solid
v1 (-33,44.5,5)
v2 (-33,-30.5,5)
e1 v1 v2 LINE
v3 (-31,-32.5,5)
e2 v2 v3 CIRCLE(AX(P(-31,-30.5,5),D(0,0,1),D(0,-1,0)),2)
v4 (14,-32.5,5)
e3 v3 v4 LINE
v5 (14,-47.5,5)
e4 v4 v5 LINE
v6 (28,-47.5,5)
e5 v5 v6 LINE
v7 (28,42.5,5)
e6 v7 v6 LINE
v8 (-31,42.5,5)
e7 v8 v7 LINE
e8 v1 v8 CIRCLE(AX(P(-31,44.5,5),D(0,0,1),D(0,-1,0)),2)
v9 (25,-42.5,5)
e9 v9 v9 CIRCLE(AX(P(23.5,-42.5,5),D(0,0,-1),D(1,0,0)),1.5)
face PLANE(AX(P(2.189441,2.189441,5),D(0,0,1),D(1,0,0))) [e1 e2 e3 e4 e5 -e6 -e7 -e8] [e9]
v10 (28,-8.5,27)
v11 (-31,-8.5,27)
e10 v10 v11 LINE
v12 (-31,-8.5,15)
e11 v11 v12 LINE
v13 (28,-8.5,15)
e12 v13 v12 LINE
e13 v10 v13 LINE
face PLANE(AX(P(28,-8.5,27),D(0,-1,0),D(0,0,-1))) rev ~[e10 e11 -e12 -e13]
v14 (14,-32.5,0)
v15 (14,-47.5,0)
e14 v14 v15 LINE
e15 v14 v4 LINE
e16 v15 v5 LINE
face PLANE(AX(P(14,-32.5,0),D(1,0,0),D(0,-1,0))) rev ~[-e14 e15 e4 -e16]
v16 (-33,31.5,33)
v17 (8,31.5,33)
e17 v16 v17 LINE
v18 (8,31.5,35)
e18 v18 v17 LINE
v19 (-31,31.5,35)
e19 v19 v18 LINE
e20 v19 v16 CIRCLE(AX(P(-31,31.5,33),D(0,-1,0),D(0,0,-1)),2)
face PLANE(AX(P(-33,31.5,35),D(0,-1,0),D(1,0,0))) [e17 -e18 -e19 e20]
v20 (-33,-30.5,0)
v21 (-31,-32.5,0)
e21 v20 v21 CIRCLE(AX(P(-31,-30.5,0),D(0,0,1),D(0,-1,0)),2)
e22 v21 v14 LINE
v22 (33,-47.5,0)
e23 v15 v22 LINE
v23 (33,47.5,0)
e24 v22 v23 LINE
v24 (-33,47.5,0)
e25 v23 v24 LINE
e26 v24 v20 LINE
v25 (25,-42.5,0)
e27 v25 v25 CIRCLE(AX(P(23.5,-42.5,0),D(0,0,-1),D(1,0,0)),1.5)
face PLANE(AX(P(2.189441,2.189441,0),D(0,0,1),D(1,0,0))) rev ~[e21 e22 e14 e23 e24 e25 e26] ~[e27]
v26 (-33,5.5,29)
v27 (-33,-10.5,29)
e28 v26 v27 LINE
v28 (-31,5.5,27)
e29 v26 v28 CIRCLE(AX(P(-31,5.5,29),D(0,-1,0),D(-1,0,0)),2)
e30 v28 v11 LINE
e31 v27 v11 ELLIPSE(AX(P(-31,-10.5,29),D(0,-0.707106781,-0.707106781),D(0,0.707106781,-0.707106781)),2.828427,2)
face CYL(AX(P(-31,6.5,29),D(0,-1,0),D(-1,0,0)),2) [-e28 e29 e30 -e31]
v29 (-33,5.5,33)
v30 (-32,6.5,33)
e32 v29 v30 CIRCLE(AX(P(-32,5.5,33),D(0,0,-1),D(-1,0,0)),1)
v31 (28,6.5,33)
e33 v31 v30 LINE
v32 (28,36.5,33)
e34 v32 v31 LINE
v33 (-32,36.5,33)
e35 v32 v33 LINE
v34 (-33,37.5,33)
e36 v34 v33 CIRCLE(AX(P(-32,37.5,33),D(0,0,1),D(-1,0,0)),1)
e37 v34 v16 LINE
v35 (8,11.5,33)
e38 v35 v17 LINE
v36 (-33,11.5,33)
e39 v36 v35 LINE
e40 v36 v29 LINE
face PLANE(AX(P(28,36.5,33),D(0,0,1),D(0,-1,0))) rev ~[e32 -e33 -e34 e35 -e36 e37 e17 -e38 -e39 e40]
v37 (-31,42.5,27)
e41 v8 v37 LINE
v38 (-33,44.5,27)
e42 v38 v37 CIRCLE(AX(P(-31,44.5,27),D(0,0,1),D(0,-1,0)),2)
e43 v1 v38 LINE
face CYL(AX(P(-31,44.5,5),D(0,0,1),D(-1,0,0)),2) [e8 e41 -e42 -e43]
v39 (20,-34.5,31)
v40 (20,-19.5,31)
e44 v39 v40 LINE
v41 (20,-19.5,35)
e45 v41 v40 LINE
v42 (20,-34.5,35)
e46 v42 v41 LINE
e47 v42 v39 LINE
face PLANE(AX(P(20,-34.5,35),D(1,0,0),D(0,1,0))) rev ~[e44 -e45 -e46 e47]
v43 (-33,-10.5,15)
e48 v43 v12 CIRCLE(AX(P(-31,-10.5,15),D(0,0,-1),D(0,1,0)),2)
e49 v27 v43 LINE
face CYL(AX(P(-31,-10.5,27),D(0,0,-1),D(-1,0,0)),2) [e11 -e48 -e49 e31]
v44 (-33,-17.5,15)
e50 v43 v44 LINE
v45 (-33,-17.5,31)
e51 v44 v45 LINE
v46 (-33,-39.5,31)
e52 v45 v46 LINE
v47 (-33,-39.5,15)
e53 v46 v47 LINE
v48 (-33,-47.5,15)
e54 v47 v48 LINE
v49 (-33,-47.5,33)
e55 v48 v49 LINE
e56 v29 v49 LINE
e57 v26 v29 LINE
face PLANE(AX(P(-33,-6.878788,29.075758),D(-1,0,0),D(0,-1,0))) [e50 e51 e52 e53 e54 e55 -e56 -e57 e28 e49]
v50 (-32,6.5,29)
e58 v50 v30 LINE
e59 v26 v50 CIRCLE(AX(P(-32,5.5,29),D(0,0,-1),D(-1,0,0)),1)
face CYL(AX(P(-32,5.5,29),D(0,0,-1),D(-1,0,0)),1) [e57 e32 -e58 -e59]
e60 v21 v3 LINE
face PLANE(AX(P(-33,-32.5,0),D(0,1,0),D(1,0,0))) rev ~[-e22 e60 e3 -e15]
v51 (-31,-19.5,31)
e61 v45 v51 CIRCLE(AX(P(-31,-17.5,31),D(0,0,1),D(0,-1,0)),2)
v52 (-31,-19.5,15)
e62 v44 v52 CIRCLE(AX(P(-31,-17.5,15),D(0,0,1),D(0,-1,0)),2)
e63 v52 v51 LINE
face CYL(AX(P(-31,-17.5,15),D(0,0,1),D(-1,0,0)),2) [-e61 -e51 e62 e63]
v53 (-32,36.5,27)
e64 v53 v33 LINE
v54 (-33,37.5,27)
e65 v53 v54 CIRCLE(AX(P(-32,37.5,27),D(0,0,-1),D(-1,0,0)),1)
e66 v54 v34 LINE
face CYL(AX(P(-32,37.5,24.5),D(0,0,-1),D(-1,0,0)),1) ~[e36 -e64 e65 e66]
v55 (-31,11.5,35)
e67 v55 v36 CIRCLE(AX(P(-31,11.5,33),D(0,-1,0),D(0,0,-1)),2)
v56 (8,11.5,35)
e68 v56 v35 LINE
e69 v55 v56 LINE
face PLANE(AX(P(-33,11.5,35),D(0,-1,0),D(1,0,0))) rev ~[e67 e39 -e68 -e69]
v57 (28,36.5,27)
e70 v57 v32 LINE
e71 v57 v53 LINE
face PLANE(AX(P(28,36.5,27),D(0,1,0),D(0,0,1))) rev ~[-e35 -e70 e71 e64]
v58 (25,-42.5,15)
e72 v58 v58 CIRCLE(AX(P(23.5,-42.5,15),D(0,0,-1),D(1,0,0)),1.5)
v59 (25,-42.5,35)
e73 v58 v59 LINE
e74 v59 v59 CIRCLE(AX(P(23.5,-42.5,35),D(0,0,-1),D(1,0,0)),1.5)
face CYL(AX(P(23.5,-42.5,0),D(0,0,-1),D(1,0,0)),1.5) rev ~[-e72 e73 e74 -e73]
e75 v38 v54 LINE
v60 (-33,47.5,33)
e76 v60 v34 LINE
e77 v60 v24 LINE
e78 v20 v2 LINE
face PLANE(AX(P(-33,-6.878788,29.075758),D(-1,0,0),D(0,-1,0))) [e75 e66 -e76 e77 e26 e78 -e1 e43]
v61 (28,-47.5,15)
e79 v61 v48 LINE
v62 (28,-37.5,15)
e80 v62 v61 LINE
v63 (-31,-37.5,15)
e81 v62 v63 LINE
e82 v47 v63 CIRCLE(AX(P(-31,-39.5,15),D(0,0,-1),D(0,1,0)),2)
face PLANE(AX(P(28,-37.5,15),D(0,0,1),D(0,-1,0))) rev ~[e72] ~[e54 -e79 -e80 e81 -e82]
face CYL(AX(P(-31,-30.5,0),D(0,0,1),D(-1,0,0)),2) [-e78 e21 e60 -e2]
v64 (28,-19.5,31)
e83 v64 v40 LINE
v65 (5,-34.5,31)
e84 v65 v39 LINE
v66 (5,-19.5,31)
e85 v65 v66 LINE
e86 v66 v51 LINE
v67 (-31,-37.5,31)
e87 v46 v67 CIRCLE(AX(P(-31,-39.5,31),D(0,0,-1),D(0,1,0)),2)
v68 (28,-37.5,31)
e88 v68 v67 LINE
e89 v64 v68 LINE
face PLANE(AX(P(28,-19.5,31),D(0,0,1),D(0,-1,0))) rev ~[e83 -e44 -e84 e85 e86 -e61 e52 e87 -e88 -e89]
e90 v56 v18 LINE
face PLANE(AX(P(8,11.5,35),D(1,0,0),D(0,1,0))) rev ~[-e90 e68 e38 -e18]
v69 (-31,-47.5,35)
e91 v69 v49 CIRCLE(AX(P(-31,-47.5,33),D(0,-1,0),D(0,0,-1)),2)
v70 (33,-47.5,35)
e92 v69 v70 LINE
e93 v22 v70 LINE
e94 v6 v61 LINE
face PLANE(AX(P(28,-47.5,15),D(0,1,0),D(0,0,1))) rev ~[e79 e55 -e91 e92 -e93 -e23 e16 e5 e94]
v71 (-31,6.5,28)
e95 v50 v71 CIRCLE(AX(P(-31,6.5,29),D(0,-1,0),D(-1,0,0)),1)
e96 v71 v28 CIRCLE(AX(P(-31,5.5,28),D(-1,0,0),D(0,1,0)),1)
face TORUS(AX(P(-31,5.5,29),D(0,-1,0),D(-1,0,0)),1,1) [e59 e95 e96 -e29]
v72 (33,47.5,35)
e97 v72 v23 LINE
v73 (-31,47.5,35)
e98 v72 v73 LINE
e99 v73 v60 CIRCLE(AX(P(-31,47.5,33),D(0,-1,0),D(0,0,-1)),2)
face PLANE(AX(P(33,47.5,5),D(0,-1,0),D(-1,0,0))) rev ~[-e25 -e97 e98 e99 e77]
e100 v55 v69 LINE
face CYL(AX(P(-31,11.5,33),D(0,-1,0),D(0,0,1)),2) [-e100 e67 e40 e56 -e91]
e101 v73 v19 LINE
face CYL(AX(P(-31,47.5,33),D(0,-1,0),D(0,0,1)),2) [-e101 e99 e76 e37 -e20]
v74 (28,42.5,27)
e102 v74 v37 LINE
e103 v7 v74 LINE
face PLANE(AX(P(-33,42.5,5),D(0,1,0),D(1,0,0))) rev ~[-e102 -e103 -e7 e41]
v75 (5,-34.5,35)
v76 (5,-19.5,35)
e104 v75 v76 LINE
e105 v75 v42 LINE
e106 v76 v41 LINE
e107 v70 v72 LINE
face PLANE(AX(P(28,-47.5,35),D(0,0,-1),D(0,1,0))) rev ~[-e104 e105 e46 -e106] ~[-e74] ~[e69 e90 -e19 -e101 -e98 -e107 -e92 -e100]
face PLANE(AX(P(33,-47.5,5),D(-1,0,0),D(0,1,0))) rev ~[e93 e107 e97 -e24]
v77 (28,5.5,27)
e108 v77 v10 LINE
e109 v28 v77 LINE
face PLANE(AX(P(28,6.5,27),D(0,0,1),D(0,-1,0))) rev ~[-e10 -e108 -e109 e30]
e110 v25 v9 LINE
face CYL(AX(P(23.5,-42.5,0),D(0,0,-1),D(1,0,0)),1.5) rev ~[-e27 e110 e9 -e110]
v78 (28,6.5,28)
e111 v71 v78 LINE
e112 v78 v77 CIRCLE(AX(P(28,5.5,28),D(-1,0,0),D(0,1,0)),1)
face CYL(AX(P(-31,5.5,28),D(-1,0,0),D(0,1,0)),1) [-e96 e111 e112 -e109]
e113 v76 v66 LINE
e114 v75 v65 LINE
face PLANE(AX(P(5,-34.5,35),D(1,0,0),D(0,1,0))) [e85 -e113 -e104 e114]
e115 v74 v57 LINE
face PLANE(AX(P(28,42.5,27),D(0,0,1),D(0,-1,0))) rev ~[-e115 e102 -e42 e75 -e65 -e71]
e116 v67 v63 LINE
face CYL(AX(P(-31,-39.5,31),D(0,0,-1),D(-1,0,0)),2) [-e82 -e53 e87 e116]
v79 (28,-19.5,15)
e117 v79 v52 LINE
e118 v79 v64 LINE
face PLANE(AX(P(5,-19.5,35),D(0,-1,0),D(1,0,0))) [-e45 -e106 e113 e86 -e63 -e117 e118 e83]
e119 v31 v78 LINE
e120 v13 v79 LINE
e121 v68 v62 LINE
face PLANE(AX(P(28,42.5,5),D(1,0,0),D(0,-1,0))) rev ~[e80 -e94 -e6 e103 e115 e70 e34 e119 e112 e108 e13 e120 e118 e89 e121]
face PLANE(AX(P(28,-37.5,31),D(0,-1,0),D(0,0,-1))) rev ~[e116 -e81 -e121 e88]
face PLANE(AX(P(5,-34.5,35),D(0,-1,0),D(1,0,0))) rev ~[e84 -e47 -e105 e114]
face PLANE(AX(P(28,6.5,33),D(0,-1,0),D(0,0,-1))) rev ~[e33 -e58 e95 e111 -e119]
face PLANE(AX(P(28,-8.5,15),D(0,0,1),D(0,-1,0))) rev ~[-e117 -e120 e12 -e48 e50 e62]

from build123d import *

# Parameters (mm, degrees)
F1_DEPTH     = 5
F3_DEPTH     = 30
F5_DEPTH     = 61
F6_W         = 41
F6_H         = 20
F6_W_2       = 15
F6_H_2       = 15
F7_DEPTH     = 4.001
F8_R         = 1.5
F9_DEPTH     = 35.001
F10_R        = 2
F11_T1_DEPTH = 8.5
F11_T3_DEPTH = 4
F11_T5_DEPTH = 59
F11_T8_ANGLE = 90


# Not quite as in the source:
# - a fillet or chamfer that OpenCascade refuses, or shapes differently, is made with other operations: its cross-section is extruded or revolved along the edge and cut away or added


with BuildPart() as f1:
    # F0 (on Top) → F1 (new body)
    with BuildSketch(Plane.XY):
        Polygon((33, 47.5), (-33, 47.5), (-33, -32.5), (14, -32.5), (14, -47.5), (33, -47.5), align=None)
    extrude(amount=F1_DEPTH)

    # F2 (on face) → F3 (join)
    with BuildSketch(Plane.XY.offset(5)):
        Polygon((-33, 42.5), (28, 42.5), (28, -47.5), (33, -47.5), (33, 47.5), (-33, 47.5), align=None)
    extrude(amount=F3_DEPTH)

    # F4 (on face) → F5 (join, through all)
    with BuildSketch(Plane(origin=(28, 0, 0), x_dir=(0, -1, 0), z_dir=(-1, 0, 0))):
        Polygon((47.5, 35), (-42.5, 35), (-42.5, 27), (-36.5, 27), (-36.5, 33), (-6.5, 33), (-6.5, 27), (8.5, 27), (8.5, 15), (19.5, 15), (19.5, 31), (37.5, 31), (37.5, 15), (47.5, 15), align=None)
    extrude(amount=F5_DEPTH)

    # F6 (on face) → F7 (cut, through all)
    with BuildSketch(Plane.XY.offset(35)):
        with Locations((-12.5, 21.5)):
            Rectangle(F6_W, F6_H)
        with Locations((12.5, -27)):
            Rectangle(F6_W_2, F6_H_2)
    extrude(amount=-F7_DEPTH, mode=Mode.SUBTRACT)

    # F8 (on face) → F9 (cut, through all)
    with BuildSketch(Plane(origin=(0, 0, 0), x_dir=(1, 0, 0), z_dir=(0, 0, -1))):
        with Locations((23.5, 42.5)):
            Circle(F8_R)
    extrude(amount=-F9_DEPTH, mode=Mode.SUBTRACT)

    # F10
    f10_edges = [f1.edges().sort_by_distance(p)[0] for p in [
        (-33, -18, 35),
        (-33, 39.5, 35),
        (-33, -19.5, 23),
        (-33, -37.5, 23),
        (-33, -8.5, 21),
        (-33, -1, 27),
        (-33, 42.5, 16),
        (-33, -32.5, 2.5),
    ]]
    fillet(f10_edges, radius=F10_R)

    # F11: fillet of radius 1 on 2 edges, made by hand

    # F11_s2 → F11_t1 (cut)
    with BuildSketch(Plane.XY.offset(24.5)):
        with BuildLine():
            ThreePointArc((-33, 37.5), (-32.7071067812, 36.7928932188), (-32, 36.5))
            Line((-32, 36.5), (-33, 36.5))
            Line((-33, 36.5), (-33, 37.5))
        make_face()
    extrude(amount=F11_T1_DEPTH, mode=Mode.SUBTRACT)

    # F11_s4 → F11_t3 (cut)
    with BuildSketch(Plane.XY.offset(29)):
        with BuildLine():
            ThreePointArc((-33, 5.5), (-32.7071067812, 6.2071067812), (-32, 6.5))
            Line((-32, 6.5), (-33, 6.5))
            Line((-33, 6.5), (-33, 5.5))
        make_face()
    extrude(amount=F11_T3_DEPTH, mode=Mode.SUBTRACT)

    # F11_s6 → F11_t5 (cut)
    with BuildSketch(Plane.YZ.offset(-31)):
        with BuildLine():
            ThreePointArc((6.5, 28), (6.2071067812, 27.2928932188), (5.5, 27))
            Line((5.5, 27), (6.5, 27))
            Line((6.5, 27), (6.5, 28))
        make_face()
    extrude(amount=F11_T5_DEPTH, mode=Mode.SUBTRACT)

    # F11_s7 → F11_t8 (revolve, cut)
    with BuildSketch(Plane.XY.offset(29)):
        with BuildLine():
            ThreePointArc((-32, 6.5), (-32.7071067812, 6.2071067812), (-33, 5.5))
            Line((-33, 5.5), (-33, 6.5))
            Line((-33, 6.5), (-32, 6.5))
        make_face()
    revolve(axis=Axis((-31, 6.5, 29), (0, -1, 0)), revolution_arc=F11_T8_ANGLE, mode=Mode.SUBTRACT)


solid = f1.part
